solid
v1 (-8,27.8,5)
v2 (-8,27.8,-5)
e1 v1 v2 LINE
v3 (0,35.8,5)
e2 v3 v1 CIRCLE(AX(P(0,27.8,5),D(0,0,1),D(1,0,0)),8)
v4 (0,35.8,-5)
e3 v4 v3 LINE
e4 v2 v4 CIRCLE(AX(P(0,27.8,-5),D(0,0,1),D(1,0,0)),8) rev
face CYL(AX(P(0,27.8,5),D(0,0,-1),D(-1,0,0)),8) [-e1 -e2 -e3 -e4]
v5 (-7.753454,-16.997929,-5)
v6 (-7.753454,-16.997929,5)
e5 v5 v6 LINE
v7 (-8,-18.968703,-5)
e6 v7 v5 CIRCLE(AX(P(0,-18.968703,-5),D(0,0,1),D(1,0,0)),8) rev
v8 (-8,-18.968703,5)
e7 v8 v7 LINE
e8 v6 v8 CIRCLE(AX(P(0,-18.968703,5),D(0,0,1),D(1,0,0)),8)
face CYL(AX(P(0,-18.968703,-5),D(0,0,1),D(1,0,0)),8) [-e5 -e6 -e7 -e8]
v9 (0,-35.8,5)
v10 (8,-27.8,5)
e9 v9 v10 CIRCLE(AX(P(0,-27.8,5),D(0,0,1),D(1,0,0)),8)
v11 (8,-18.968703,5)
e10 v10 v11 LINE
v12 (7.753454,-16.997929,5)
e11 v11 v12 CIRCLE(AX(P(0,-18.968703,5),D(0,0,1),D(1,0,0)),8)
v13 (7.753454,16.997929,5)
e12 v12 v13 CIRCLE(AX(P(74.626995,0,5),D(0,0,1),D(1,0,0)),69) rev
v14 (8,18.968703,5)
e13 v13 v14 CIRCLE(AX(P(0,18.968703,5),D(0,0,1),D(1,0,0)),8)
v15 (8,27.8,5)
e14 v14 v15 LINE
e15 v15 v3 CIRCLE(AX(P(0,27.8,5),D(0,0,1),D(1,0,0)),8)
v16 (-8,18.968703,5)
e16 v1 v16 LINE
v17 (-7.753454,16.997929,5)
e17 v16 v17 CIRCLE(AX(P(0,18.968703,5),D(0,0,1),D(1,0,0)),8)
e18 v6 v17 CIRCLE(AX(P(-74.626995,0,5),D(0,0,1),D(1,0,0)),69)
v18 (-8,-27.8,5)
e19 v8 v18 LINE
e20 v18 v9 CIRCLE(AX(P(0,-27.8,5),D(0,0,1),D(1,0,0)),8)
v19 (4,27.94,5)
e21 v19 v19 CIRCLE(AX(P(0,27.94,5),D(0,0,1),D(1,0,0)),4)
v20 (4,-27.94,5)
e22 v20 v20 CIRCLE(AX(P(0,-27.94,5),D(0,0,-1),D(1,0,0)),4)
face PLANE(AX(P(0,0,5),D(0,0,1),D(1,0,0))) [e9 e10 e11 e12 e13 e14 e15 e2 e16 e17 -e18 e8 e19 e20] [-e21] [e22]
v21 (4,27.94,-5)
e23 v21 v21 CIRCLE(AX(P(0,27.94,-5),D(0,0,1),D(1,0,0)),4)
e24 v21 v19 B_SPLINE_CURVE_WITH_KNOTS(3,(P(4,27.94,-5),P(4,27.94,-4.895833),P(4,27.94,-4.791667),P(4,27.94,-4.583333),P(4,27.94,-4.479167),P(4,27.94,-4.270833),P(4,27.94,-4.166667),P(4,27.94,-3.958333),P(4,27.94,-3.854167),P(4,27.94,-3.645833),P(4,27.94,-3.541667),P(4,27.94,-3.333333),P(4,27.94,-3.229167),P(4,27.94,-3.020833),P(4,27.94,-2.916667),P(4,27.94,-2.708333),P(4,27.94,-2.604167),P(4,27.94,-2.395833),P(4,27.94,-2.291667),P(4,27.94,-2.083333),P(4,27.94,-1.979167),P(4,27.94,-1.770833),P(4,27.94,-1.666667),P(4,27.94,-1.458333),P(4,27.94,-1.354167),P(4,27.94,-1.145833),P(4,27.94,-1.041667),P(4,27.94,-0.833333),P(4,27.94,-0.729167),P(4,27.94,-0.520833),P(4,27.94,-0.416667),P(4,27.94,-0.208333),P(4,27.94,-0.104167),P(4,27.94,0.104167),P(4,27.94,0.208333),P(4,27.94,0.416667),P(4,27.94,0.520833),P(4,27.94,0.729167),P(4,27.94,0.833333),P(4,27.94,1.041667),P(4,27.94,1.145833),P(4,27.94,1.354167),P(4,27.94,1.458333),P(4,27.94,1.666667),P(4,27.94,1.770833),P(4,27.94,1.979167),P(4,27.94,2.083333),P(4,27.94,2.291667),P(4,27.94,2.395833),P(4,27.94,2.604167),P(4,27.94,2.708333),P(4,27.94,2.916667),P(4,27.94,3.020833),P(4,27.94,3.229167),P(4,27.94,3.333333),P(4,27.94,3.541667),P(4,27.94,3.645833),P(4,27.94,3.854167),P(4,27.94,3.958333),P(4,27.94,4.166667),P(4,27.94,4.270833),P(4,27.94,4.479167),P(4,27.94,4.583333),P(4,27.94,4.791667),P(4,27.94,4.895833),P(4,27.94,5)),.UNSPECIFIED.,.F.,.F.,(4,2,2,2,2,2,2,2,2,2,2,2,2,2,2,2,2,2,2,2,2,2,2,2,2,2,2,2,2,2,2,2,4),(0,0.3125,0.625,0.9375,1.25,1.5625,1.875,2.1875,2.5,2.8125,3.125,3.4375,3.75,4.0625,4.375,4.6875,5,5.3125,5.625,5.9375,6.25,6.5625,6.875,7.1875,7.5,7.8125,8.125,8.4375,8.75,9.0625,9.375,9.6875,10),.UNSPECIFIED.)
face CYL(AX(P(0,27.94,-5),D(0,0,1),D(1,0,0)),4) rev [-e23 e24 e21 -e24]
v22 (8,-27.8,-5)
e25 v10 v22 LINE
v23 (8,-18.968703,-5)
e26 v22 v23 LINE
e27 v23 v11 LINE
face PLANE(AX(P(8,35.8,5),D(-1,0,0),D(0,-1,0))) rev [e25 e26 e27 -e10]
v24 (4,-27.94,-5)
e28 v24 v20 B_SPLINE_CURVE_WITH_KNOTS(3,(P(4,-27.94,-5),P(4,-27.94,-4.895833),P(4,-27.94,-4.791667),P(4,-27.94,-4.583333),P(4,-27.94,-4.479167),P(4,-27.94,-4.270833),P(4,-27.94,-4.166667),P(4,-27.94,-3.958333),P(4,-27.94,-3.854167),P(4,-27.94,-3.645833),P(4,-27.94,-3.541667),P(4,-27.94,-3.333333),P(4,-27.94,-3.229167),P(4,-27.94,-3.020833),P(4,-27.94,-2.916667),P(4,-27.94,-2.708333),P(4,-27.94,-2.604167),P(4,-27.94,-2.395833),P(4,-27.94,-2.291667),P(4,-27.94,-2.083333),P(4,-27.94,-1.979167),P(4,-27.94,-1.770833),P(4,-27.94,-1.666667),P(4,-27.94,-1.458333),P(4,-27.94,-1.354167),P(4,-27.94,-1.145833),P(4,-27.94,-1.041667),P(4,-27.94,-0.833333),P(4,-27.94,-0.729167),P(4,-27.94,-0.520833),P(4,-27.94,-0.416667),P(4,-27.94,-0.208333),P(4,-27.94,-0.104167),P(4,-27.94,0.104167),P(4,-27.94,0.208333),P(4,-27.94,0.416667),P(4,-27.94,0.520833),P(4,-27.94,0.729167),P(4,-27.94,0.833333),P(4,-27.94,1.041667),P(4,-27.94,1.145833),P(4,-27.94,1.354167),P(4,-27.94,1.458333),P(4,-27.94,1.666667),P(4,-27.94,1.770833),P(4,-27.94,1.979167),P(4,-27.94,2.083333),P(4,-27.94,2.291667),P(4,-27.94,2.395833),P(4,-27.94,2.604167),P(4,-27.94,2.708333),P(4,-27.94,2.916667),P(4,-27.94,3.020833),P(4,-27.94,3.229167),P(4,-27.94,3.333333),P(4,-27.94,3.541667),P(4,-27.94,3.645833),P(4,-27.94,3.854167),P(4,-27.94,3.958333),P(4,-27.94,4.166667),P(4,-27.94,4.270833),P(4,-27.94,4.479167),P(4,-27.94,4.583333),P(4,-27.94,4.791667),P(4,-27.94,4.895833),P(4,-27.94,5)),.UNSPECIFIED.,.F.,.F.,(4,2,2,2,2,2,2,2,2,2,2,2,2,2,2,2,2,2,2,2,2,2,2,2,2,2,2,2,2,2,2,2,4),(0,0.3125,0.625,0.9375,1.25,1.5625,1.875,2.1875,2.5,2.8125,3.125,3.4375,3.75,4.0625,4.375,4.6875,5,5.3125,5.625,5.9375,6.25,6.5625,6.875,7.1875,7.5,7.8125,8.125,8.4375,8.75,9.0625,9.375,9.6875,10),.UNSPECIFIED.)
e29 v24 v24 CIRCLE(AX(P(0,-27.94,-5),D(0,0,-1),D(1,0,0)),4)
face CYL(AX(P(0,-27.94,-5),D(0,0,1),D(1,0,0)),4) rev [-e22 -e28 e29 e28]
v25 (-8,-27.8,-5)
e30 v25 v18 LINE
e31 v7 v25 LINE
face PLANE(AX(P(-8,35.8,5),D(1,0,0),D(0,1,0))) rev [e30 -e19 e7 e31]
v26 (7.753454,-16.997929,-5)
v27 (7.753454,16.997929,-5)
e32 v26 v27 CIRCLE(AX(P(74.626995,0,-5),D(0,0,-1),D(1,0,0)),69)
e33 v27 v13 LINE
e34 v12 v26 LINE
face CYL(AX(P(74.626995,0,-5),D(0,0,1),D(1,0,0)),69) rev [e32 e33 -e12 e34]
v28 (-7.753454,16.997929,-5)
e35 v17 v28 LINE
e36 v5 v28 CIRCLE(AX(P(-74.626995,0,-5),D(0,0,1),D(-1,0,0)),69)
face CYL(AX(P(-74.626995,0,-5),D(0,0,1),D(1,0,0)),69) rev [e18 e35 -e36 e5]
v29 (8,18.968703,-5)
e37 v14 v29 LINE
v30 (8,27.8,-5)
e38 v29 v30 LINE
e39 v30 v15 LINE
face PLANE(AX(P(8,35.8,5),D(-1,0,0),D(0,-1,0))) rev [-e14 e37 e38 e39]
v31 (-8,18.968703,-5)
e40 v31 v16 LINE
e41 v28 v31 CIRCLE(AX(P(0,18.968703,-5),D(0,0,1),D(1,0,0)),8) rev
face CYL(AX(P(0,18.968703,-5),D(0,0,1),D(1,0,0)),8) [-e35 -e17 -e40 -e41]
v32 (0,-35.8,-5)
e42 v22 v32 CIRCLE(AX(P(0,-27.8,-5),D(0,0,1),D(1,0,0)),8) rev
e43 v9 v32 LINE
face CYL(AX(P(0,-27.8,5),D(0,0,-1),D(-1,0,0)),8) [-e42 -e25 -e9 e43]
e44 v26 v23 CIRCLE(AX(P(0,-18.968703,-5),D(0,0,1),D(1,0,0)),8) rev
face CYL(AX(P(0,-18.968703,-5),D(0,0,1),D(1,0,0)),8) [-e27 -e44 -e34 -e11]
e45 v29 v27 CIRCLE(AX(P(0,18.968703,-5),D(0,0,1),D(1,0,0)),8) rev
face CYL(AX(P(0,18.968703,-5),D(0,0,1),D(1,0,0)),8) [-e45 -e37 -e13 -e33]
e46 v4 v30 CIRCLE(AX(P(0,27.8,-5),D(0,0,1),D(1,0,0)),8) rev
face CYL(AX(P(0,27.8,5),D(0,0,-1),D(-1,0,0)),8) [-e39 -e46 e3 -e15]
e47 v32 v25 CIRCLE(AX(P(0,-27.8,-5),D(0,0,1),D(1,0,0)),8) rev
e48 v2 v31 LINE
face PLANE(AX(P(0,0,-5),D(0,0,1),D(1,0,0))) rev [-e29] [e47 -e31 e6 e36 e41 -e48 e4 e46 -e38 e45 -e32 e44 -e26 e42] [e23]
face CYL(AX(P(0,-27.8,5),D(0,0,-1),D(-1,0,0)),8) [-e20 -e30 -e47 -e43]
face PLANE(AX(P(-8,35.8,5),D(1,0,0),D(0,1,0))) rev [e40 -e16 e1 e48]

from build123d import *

# Parameters (mm, degrees)
SKETCH1_W          = 16
SKETCH1_H          = 71.6
BODY_DEPTH         = 5
SKETCH2_R          = 4
TOP_HOLE_DEPTH     = 39.021572824
CUT_EXTRUDE1_DEPTH = 39.021572824
FILLET1_R          = 8


with BuildPart() as part:
    # Sketch1 → Body (new, symmetric)
    with BuildSketch(Plane.XY):
        Rectangle(SKETCH1_W, SKETCH1_H)
    extrude(amount=BODY_DEPTH, both=True)

    # Sketch2 → Top Hole (cut, through all)
    with BuildSketch(Plane.XY.offset(5)):
        with Locations((0, 27.94)):
            Circle(SKETCH2_R)
    top_hole = extrude(amount=-TOP_HOLE_DEPTH, mode=Mode.SUBTRACT)

    # Bottom Hole: Top Hole across plane
    add(top_hole.mirror(Plane.ZX), mode=Mode.SUBTRACT)

    # Sketch3 → Cut-Extrude1 (cut, symmetric)
    with BuildSketch(Plane.XY.offset(5)):
        with BuildLine():
            Line((-8, 17.94), (-8, -17.94))
            ThreePointArc((-8, -17.94), (-5.626994529, 0), (-8, 17.94))
        make_face()
    cut_extrude1 = extrude(amount=CUT_EXTRUDE1_DEPTH, both=True, mode=Mode.SUBTRACT)

    # Mirror1: Cut-Extrude1 across plane
    add(cut_extrude1.mirror(Plane(origin=(0, 0, 0), x_dir=(0, 0, 1), z_dir=(1, 0, 0))), mode=Mode.SUBTRACT)

    # Fillet1
    fillet1_edges = [part.edges().sort_by_distance(p)[0] for p in [
        (8, -35.8, 0),
        (-8, -35.8, 0),
        (8, 35.8, 0),
        (-8, 35.8, 0),
        (-8, 17.94, 0),
        (-8, -17.94, 0),
        (8, -17.94, 0),
        (8, 17.94, 0),
    ]]
    fillet(fillet1_edges, radius=FILLET1_R - 0.0001)  # a hair under: the kernel refuses the full size


solid = part.part
